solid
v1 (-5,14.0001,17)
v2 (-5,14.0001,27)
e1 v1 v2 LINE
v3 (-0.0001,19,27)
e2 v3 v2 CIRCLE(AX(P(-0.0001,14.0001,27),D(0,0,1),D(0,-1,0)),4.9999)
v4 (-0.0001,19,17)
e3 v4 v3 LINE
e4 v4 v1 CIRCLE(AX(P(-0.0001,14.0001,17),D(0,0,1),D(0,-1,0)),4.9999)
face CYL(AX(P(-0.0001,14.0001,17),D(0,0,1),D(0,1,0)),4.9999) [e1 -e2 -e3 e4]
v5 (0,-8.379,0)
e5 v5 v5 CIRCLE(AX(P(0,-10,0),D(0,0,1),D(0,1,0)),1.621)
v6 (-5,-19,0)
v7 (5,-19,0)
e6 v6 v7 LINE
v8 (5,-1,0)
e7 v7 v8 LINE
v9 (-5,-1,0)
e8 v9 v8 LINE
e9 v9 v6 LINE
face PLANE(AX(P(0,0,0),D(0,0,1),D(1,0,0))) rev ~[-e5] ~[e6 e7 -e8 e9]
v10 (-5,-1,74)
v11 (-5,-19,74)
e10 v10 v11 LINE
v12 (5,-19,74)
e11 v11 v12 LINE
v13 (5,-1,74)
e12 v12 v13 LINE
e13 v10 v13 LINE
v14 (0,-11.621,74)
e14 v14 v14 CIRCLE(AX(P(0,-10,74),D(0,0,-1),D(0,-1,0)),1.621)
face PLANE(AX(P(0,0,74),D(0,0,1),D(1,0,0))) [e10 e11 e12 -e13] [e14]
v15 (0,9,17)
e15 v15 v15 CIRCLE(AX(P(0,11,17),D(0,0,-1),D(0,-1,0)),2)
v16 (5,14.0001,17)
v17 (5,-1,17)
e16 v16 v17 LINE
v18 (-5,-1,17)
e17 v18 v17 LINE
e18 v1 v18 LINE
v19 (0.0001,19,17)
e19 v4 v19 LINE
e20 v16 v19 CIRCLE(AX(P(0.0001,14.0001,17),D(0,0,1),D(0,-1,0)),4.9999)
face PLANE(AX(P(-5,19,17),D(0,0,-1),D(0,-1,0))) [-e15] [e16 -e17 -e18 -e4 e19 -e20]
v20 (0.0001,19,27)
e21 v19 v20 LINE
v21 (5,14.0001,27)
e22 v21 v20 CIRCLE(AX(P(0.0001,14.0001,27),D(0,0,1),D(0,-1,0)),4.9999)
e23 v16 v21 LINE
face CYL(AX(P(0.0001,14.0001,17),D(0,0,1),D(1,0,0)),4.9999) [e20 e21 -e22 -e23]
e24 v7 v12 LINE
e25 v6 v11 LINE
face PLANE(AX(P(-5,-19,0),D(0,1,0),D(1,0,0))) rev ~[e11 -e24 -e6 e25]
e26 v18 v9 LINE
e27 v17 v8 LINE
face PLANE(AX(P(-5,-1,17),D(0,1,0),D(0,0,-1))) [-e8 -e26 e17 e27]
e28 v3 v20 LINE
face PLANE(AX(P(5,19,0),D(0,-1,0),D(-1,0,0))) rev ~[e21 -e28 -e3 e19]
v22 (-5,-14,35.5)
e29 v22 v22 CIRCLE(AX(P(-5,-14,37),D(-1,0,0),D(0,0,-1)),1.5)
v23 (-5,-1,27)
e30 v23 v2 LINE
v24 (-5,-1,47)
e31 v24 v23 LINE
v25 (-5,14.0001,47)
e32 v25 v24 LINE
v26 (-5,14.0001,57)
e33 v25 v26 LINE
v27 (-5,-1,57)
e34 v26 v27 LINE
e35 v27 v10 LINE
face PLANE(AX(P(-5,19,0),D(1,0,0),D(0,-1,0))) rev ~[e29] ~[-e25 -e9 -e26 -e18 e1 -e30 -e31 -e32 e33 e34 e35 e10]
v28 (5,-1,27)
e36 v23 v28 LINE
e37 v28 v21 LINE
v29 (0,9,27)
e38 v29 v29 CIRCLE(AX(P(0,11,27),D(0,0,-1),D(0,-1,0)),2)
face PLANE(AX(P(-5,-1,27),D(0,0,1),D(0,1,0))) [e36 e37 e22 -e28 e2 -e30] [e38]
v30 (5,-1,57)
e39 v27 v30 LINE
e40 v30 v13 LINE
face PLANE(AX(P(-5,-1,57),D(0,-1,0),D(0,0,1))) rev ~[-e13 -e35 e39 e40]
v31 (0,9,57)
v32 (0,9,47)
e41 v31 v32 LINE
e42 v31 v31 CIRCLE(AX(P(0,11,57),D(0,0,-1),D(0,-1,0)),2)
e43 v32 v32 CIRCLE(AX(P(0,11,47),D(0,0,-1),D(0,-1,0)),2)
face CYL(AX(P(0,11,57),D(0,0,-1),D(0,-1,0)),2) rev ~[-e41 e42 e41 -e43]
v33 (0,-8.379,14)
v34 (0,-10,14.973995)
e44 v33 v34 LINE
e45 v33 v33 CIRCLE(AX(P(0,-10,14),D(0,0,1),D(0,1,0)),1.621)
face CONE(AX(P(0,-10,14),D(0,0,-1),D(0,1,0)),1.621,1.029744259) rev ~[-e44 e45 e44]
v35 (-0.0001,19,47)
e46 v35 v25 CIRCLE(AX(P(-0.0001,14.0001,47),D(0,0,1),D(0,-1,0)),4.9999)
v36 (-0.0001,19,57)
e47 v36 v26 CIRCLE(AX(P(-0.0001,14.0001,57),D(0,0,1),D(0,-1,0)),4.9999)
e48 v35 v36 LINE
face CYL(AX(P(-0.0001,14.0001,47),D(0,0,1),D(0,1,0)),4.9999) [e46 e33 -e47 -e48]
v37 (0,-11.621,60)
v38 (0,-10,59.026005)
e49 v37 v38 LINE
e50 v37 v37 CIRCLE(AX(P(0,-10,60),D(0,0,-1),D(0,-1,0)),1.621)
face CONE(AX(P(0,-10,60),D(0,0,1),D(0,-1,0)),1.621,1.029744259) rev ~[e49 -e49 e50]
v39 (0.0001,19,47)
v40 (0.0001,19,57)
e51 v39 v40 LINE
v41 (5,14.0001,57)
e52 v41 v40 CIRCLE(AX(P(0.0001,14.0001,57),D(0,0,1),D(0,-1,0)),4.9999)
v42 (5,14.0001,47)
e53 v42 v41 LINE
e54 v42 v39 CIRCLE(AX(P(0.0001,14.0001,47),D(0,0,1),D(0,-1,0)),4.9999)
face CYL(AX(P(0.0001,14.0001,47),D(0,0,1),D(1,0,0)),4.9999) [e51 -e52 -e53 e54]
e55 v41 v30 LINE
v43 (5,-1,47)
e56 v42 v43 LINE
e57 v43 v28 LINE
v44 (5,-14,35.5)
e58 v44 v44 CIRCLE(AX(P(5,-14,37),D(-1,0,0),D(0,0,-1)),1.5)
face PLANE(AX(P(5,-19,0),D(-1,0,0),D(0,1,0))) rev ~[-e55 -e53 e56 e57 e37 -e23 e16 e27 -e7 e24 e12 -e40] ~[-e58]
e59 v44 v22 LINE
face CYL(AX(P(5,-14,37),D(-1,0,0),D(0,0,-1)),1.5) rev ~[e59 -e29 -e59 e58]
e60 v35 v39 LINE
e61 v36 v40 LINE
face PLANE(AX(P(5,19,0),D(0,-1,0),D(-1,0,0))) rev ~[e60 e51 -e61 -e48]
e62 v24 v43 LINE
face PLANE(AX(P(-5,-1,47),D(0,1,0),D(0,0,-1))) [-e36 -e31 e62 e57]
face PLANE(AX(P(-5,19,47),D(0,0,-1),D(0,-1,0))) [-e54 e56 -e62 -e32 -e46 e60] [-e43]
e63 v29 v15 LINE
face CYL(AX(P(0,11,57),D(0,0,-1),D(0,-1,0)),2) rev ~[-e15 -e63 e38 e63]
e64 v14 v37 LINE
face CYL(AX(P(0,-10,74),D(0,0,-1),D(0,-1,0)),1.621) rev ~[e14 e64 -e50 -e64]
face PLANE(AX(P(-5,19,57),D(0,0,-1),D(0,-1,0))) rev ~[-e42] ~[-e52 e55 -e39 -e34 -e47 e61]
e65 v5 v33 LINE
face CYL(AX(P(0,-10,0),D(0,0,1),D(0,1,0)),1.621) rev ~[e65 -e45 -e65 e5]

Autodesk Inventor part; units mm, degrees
ref_plane "YZ Plane" through (0, 0, 0) normal (1, 0, 0) x (0, 1, 0)
ref_plane "XZ Plane" through (0, 0, 0) normal (0, 1, 0) x (-1, 0, 0)
ref_plane "XY Plane" through (0, 0, 0) normal (0, 0, 1) x (1, 0, 0)
sketch "Skizze1" plane through (0, 0, 0) normal (0, 0, 1) x (1, 0, 0)
  line L0 (5, 19) -> (-5, 19)
  line L1 (-5, 19) -> (-5, -19)
  line L2 (-5, -19) -> (5, -19)
  line L3 (5, -19) -> (5, 19)
  line L4 (5, 19) -> (-5, -19) construction
  line L5 (-5, 19) -> (5, -19) construction
  point P0 (0, 0)
  dimension "d0" = 38
  dimension "d1" = 10
extrude "Extrusion1" add sketch "Skizze1" along normal blind 74
sketch "Skizze2" plane through (-5, -19, 0) normal (-1, 0, 0) x (0, 0, 1)
  line L0 (0, 38) -> (74, 38) projected
  line L1 (0, 38) -> (17, 38)
  line L2 (17, 38) -> (17, 18)
  line L3 (17, 18) -> (0, 18)
  line L4 (0, 18) -> (0, 38)
  line L5 (74, 38) -> (57, 38)
  line L6 (57, 38) -> (57, 18)
  line L7 (57, 18) -> (74, 18)
  line L8 (74, 18) -> (74, 38)
  line L9 (27, 38) -> (47, 38)
  line L10 (47, 38) -> (47, 18)
  line L11 (47, 18) -> (27, 18)
  line L12 (27, 18) -> (27, 38)
  line L13 (0, 0) -> (74, 0) projected
  point P0 (0, 19)
  dimension "d4" = 18
  dimension "d5" = 20
  dimension "d6" = 40
  dimension "d7" = 10
  dimension "d8" = 18
  dimension "d9" = 18
extrude "Extrusion2" cut sketch "Skizze2" against normal blind 74
fillet "Rundung1" radius 5 4 edges at (-5, 19, 22) (-5, 19, 52) (5, 19, 52) (5, 19, 22)
sketch "Skizze5" plane through (0, 0, 74) normal (0, 0, 1) x (1, 0, 0)
  line L0 (5, -19) -> (-5, -19) projected
  line L1 (-5, -19) -> (-5, -1) projected
  point P0 (0, 0)
  point P1 (0, -10)
  dimension "d33" = 9
  dimension "d34" = 5
hole "Bohrung3" at (0, -10, 74) direction (0, 0, -1) diameter 3.242 depth 14 tip angle 118 thread size "M4x0.7" class "6H" standard "ISO Metric profile"
sketch "Skizze6" plane through (0, 0, 0) normal (0, 0, -1) x (-1, 0, 0)
  line L0 (5, -1) -> (5, -19) projected
  line L1 (5, -19) -> (-5, -19) projected
  point P0 (0, 0)
  point P1 (0, -10)
  dimension "d42" = 5
  dimension "d43" = 9
hole "Bohrung4" at (0, -10, 0) direction (0, 0, 1) diameter 3.242 depth 14 tip angle 118 thread size "M4x0.7" class "6H" standard "ISO Metric profile"
sketch "Skizze7" plane through (5, -19, 74) normal (1, 0, 0) x (0, 0, -1)
  line L0 (74, 0) -> (0, 0) projected
  line L1 (0, 18) -> (0, 0) projected
  point P0 (74, 19)
  point P1 (37, 5)
  dimension "d51" = 5
  dimension "d52" = 37
hole "Bohrung5" at (5, -14, 37) direction (-1, 0, 0) diameter 3 end through all
sketch "Skizze8" plane through (-5, -1, 57) normal (0, 0, 1) x (1, 0, 0)
  line L0 (10, 0) -> (0, 0) projected
  line L1 (0, 0) -> (0, 15) projected
  point P0 (5, 1)
  point P1 (5, 12)
  dimension "d60" = 12
  dimension "d61" = 5
hole "Bohrung6" at (0, 11, 57) direction (0, 0, -1) diameter 4 end through all
properties part number "ABI_Führungsblock"
